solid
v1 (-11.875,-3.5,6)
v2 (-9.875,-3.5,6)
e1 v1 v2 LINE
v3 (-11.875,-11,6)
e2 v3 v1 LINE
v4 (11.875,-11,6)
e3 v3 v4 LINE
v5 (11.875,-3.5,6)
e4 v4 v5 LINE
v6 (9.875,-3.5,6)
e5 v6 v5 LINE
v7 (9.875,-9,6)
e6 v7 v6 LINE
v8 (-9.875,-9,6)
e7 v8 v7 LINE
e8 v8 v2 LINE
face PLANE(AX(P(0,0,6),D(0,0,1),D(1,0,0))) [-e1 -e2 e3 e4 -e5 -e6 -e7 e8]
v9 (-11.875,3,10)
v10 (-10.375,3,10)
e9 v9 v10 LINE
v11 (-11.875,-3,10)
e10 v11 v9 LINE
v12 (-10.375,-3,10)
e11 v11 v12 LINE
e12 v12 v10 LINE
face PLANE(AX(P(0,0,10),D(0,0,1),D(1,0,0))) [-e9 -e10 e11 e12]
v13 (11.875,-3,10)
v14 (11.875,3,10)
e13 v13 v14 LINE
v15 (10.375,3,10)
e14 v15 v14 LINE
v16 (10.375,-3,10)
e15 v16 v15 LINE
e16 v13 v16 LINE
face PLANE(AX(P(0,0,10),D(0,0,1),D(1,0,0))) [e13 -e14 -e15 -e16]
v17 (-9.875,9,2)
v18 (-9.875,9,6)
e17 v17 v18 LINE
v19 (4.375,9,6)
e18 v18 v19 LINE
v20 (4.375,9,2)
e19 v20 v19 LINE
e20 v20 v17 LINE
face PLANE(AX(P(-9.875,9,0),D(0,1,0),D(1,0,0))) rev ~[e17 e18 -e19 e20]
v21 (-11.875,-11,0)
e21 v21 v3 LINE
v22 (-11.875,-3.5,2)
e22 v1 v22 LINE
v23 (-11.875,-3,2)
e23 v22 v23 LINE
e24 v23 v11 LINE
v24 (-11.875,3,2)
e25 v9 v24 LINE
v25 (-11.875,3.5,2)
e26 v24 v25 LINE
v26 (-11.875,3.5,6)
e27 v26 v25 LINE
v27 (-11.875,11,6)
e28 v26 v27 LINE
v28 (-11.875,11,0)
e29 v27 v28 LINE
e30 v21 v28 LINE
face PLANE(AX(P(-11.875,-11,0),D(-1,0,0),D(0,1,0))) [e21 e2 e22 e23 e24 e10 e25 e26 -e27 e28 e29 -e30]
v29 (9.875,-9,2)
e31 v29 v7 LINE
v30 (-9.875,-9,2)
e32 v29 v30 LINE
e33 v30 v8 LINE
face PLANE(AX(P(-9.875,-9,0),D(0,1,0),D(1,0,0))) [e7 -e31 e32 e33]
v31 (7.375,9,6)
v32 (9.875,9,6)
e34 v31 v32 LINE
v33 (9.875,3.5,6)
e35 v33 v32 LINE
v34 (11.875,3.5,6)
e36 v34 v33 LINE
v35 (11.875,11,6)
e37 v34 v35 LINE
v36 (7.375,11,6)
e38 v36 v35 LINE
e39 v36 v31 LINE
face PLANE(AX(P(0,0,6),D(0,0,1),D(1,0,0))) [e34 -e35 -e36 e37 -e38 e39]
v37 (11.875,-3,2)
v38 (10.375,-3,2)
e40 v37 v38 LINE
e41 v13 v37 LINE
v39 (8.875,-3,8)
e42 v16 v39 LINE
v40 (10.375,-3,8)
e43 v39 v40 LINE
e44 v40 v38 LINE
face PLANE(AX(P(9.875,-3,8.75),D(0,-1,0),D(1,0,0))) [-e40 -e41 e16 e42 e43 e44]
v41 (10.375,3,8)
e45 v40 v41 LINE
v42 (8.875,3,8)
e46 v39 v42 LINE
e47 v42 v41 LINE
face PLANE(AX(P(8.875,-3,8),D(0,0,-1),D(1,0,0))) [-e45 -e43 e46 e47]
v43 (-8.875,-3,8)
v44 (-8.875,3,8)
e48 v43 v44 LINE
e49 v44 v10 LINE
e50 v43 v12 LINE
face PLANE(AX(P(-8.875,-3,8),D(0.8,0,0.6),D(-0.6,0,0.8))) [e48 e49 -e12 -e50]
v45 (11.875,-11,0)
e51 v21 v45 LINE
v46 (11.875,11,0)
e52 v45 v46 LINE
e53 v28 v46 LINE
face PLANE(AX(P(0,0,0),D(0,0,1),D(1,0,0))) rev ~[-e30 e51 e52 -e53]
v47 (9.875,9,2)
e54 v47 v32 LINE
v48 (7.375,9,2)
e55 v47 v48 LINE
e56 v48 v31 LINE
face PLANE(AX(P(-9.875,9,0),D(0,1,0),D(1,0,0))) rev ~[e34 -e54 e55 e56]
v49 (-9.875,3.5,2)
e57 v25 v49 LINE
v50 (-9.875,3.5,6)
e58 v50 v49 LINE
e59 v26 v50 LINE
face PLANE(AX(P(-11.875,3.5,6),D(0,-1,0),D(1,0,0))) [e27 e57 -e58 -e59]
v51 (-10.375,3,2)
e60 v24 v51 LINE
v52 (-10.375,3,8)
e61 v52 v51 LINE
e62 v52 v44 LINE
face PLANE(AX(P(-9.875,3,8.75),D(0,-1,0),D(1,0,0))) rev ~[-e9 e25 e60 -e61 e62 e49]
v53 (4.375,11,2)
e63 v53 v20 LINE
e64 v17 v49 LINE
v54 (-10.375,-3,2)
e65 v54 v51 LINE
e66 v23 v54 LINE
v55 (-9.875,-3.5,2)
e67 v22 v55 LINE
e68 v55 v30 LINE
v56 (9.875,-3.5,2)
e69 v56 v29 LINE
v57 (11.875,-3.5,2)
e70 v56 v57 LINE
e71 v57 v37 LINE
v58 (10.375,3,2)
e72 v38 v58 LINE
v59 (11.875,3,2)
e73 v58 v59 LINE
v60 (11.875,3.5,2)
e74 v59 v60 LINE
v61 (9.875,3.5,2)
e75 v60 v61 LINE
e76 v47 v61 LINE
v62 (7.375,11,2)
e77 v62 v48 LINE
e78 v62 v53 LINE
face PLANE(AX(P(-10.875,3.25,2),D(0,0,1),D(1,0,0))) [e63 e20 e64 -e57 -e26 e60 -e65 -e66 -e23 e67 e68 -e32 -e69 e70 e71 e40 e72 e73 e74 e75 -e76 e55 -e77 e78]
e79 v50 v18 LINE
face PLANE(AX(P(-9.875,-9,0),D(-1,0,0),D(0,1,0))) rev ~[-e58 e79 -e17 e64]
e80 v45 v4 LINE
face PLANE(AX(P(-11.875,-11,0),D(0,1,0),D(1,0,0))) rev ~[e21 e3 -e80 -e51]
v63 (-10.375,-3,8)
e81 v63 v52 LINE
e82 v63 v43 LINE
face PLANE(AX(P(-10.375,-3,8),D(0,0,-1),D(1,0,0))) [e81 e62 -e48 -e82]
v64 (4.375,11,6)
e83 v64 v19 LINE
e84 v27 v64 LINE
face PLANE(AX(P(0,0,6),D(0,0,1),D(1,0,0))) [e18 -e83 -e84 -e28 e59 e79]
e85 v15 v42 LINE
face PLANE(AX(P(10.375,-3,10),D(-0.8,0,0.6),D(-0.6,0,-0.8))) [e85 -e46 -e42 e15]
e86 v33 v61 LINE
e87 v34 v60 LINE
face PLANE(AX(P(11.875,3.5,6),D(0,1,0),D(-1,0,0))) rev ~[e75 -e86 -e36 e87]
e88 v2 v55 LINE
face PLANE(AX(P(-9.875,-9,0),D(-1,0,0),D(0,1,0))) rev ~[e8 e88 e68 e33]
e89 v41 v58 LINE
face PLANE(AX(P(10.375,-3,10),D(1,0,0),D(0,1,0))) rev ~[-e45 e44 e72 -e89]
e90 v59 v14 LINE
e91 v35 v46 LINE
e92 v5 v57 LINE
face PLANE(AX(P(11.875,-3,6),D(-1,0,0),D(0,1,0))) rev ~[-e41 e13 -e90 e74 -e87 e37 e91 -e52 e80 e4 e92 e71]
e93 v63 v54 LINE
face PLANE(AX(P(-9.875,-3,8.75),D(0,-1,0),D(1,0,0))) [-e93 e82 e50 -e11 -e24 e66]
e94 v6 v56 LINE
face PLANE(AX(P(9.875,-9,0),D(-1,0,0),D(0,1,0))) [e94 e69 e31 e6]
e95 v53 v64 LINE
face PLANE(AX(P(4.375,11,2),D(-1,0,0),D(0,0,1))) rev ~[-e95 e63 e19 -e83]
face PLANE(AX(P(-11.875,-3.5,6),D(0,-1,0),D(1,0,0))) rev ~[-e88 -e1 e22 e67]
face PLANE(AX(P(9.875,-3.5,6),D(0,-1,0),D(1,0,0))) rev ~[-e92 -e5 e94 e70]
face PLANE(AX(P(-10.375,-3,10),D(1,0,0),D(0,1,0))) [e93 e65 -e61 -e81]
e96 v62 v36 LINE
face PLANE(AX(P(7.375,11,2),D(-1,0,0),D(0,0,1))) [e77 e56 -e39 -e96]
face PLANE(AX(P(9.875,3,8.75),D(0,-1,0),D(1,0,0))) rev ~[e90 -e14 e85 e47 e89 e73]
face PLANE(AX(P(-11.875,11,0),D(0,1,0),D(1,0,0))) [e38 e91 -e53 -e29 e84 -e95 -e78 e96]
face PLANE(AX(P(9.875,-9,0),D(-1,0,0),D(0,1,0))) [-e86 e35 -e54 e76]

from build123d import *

# Parameters (mm, degrees)
F0_W      = 23.75
F0_H      = 22
F0_W_2    = 19.75
F0_H_2    = 18
F1_DEPTH  = 2
F2_DEPTH  = 6
F3_W      = 2
F3_H      = 0.5
F4_DEPTH  = 4
F5_DEPTH  = 4
F7_DEPTH  = 6
F8_W      = 3
F8_H      = 4
F9_DEPTH  = 5.2
F10_W     = 0.5
F10_H     = 6
F11_DEPTH = 8
F12_W     = 0.5
F12_H     = 6
F13_DEPTH = 8
F15_DEPTH = 6
F17_DEPTH = 6


# Not quite as in the source:
# - a feature names something its author has since deleted; it is built from what else it names


with BuildPart() as f1:
    # F0 (on Top) → F1 (new body)
    with BuildSketch(Plane.XY):
        Rectangle(F0_W, F0_H)
        Rectangle(F0_W_2, F0_H_2, mode=Mode.SUBTRACT)
        Rectangle(F0_W_2, F0_H_2)
    extrude(amount=F1_DEPTH)

    # F0 (on Top) → F2 (join)
    with BuildSketch(Plane.XY):
        Rectangle(F0_W, F0_H)
        Rectangle(F0_W_2, F0_H_2, mode=Mode.SUBTRACT)
    extrude(amount=F2_DEPTH)

    # F3 (on face) → F4 (cut)
    with BuildSketch(Plane.XY.offset(6)):
        Polygon((10.875, -3), (9.875, -3), (9.875, -3.5), (11.875, -3.5), (11.875, -3), align=None)
        Polygon((9.875, 3.5), (9.875, 3), (10.875, 3), (11.875, 3), (11.875, 3.5), align=None)
        with Locations((-10.875, 3.25)):
            Rectangle(F3_W, F3_H)
        with Locations((-10.875, -3.25)):
            Rectangle(F3_W, F3_H)
    extrude(amount=-F4_DEPTH, mode=Mode.SUBTRACT)

    # F5 (add): faces of the model
    f5_faces = [f1.faces().sort_by_distance(p)[0] for p in [
        (10.875, 0, 6),
        (-10.875, 0, 6),
    ]]
    extrude(f5_faces, amount=F5_DEPTH)

    # F6 (on face) → F7 (join)
    with BuildSketch(Plane.XZ.offset(3)):
        Polygon((11.875, 8), (11.875, 10), (10.375, 8), align=None)
    extrude(amount=-F7_DEPTH)

    # F8 (on face) → F9 (cut)
    with BuildSketch(Plane(origin=(0, 11, 0), x_dir=(-1, 0, 0), z_dir=(0, 1, 0))):
        with Locations((-5.875, 4)):
            Rectangle(F8_W, F8_H)
    extrude(amount=-F9_DEPTH, mode=Mode.SUBTRACT)

    # F10 (on face) → F11 (cut)
    with BuildSketch(Plane.XY.offset(10)):
        with Locations((-10.125, 0)):
            Rectangle(F10_W, F10_H)
    extrude(amount=-F11_DEPTH, mode=Mode.SUBTRACT)

    # F12 (on face) → F13 (cut)
    with BuildSketch(Plane.XY.offset(10)):
        with Locations((10.125, 0)):
            Rectangle(F12_W, F12_H)
    extrude(amount=-F13_DEPTH, mode=Mode.SUBTRACT)

    # F14 (on face) → F15 (join)
    with BuildSketch(Plane.XZ.offset(3)):
        Polygon((10.375, 8), (10.375, 10), (8.875, 8), align=None)
    extrude(amount=-F15_DEPTH)

    # F16 (on face) → F17 (join)
    with BuildSketch(Plane.XZ.offset(3)):
        Polygon((-8.875, 8), (-10.375, 10), (-10.375, 8), align=None)
    extrude(amount=-F17_DEPTH)


solid = f1.part
